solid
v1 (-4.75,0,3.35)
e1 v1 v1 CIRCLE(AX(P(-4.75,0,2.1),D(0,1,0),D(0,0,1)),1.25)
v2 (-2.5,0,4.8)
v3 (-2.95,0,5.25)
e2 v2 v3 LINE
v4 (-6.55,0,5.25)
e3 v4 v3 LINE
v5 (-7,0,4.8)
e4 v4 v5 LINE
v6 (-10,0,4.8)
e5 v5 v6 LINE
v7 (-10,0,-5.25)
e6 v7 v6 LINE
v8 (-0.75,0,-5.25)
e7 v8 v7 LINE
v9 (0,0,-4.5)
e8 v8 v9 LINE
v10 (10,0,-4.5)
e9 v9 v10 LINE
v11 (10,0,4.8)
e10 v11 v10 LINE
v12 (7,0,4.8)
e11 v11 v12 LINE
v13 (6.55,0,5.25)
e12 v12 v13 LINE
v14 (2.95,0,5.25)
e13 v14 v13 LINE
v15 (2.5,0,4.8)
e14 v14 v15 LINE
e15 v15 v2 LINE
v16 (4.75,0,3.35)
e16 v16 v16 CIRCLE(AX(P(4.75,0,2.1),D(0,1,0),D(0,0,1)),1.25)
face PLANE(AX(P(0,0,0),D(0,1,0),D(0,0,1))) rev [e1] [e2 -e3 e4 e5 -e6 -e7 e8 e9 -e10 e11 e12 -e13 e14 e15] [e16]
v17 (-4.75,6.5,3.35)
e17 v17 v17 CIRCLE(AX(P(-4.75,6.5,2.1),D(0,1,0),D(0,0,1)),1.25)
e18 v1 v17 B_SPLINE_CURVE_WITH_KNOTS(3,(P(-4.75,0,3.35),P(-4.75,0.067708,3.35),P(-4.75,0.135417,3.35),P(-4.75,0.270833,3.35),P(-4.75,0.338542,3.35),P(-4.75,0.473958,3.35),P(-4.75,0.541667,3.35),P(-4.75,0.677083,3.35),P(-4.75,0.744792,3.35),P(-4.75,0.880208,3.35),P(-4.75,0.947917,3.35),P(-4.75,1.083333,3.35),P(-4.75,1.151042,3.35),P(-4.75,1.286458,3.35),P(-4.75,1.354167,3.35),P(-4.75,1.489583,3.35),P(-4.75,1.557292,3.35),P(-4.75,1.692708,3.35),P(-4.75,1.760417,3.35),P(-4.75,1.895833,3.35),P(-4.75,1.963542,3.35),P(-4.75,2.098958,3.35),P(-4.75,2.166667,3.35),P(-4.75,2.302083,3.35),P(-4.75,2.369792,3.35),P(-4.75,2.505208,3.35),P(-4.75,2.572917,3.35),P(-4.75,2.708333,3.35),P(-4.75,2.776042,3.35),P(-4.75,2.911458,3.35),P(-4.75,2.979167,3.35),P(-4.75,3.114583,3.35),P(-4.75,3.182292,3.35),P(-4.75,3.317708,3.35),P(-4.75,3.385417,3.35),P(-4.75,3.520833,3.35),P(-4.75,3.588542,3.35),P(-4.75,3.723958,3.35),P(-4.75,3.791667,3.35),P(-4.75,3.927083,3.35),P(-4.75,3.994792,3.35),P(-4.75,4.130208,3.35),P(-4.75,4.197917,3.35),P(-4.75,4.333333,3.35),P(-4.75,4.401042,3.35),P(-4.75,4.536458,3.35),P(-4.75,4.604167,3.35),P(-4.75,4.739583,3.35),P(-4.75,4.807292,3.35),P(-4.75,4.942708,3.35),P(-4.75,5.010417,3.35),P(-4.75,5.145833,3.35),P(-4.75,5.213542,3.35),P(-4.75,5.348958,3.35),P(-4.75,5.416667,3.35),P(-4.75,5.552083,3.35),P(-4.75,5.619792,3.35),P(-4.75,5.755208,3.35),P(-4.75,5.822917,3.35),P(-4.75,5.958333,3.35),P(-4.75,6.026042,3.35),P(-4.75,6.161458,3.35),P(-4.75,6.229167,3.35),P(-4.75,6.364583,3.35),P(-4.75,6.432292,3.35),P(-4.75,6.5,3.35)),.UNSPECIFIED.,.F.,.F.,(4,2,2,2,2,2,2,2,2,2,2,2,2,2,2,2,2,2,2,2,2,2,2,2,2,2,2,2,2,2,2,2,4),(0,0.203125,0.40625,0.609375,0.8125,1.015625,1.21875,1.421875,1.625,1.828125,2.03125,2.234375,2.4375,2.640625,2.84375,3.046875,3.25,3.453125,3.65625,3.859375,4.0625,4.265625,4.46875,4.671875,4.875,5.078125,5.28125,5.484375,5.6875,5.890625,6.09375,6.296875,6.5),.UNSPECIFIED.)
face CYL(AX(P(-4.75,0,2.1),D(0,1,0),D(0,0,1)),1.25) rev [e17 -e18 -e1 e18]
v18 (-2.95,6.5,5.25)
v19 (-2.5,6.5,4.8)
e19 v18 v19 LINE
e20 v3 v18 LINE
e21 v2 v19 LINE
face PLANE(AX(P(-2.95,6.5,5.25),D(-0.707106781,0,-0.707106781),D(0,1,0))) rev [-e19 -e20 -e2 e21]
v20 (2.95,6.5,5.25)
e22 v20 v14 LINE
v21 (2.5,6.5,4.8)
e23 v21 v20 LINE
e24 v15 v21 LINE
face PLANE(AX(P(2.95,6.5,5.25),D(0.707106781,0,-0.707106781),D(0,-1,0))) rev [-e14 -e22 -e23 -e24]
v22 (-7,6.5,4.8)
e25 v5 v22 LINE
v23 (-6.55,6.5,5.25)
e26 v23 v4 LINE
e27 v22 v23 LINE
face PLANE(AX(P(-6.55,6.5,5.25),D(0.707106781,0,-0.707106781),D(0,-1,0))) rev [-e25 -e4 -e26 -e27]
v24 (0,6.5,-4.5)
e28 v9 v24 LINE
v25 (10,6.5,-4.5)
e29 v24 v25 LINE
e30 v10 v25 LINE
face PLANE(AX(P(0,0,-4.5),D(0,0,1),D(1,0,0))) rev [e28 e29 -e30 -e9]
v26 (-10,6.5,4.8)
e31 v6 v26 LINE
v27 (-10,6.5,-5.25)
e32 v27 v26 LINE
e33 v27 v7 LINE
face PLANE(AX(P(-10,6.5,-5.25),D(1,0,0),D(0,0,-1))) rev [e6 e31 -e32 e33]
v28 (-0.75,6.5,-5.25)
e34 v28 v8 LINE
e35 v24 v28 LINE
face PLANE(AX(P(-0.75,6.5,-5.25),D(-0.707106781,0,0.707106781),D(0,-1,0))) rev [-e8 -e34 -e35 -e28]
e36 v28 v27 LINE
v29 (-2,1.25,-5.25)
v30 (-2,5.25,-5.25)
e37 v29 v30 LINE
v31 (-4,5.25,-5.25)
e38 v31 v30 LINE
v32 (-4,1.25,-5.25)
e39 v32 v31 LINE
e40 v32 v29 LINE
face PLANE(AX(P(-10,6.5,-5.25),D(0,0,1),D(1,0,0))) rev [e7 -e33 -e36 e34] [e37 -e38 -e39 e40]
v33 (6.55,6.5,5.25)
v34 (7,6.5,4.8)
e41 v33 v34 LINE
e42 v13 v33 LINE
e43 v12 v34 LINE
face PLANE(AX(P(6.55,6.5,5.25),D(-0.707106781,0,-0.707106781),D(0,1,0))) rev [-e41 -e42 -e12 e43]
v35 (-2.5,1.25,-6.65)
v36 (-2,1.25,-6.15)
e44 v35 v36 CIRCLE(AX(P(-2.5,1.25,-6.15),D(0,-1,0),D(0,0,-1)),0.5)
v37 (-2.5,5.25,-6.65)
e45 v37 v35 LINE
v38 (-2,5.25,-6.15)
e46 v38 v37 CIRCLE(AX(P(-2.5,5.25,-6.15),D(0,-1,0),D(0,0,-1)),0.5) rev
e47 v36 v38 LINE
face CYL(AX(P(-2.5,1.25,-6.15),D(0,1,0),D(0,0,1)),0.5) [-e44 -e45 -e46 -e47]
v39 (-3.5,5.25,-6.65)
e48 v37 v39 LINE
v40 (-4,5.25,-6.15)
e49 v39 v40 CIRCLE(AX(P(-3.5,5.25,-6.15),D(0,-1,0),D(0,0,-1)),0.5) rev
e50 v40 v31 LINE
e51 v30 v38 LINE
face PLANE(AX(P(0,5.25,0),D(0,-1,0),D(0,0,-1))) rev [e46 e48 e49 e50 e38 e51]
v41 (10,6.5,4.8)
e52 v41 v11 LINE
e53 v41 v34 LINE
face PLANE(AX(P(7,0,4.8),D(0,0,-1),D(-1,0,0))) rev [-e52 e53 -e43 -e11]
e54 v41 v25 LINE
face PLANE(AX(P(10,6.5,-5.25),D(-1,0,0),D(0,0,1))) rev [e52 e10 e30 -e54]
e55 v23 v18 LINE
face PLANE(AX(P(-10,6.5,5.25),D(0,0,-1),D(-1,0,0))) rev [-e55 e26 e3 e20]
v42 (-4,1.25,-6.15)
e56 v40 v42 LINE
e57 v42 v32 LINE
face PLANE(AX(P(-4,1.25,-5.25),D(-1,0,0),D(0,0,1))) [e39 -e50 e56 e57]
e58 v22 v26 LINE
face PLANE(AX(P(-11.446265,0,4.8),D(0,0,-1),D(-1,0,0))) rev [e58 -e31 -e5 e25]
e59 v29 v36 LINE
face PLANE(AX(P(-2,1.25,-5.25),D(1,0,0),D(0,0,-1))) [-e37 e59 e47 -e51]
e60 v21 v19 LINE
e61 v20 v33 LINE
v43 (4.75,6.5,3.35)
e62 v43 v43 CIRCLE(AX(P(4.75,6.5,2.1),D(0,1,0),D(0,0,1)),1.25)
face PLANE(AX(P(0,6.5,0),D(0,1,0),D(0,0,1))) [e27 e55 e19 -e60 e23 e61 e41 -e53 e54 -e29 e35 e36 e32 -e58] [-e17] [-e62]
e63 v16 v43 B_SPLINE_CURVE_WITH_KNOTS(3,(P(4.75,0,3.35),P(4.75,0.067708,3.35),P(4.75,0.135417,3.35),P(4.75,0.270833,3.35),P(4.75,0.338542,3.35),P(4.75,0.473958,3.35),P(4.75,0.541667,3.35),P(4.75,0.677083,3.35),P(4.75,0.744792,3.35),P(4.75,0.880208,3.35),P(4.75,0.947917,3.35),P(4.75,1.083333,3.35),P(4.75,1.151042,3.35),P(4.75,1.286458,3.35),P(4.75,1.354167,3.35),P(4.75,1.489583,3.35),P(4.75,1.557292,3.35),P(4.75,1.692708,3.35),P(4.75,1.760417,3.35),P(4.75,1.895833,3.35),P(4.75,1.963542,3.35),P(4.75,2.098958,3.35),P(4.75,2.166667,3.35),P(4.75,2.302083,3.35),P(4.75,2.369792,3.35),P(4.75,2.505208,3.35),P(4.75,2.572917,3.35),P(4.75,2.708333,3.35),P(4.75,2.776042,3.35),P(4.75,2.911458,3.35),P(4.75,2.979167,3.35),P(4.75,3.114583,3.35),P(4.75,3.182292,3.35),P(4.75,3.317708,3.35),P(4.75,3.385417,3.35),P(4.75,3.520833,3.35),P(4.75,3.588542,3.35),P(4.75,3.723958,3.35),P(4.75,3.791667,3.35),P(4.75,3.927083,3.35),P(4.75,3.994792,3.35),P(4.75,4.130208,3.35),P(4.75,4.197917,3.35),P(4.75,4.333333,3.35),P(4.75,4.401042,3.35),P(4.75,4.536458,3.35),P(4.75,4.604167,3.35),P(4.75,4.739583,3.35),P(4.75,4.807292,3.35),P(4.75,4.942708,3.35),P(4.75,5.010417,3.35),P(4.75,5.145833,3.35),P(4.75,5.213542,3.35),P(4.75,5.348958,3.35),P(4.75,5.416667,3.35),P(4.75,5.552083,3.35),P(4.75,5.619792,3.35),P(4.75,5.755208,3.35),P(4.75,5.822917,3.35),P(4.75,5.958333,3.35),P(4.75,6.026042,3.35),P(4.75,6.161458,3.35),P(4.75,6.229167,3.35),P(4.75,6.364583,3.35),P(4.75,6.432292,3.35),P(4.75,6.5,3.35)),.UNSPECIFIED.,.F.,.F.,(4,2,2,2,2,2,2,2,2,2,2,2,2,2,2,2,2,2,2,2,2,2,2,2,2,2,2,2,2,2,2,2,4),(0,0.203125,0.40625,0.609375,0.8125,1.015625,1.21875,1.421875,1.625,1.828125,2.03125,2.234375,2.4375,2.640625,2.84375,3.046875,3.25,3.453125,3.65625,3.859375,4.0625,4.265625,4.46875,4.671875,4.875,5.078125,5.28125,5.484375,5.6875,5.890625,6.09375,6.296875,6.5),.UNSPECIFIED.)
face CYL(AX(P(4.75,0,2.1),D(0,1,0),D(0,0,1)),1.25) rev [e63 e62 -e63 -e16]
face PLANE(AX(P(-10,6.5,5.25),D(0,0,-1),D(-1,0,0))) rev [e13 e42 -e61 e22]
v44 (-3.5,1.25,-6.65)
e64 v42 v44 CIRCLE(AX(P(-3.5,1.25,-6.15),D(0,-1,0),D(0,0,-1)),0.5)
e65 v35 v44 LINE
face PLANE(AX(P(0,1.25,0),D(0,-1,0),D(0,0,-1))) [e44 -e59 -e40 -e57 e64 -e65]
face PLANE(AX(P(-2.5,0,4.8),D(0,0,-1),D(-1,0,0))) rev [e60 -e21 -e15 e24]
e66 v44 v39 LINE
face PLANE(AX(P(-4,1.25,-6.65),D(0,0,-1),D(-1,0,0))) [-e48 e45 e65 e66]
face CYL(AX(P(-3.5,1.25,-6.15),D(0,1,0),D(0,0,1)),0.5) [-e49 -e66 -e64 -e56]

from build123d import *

# Parameters (mm, degrees)
SKETCH_1_W          = 20
SKETCH_1_H          = 10.5
EXTRUDE_1_DEPTH     = 6.5
SKETCH_2_R          = 1.25
CUT_EXTRUDE_1_DEPTH = 6.5
SKETCH_3_W          = 4.44626532
SKETCH_3_H          = 1.008872475
SKETCH_3_W_2        = 5
SKETCH_3_W_3        = 3.65317203
CUT_EXTRUDE_2_DEPTH = 6.5
CHAMFER_1_SIZE      = 0.45
SKETCH_4_W          = 10.31021277
SKETCH_4_H          = 1.008783122
CUT_EXTRUDE_3_DEPTH = 6.5
CHAMFER_2_SIZE      = 0.75
SKETCH_5_W          = 2
SKETCH_5_H          = 1.4
EXTRUDE_2_DEPTH     = 4
FILLET_1_R          = 0.5


with BuildPart() as part:
    # 스케치1 → 보스-돌출1 (new body)
    with BuildSketch(Plane(origin=(0, 0, 0), x_dir=(1, 0, 0), z_dir=(0, 1, 0))):
        Rectangle(SKETCH_1_W, SKETCH_1_H)
    extrude(amount=EXTRUDE_1_DEPTH)

    # 스케치2 → 컷-돌출1 (cut)
    with BuildSketch(Plane(origin=(0, 6.5, 0), x_dir=(1, 0, 0), z_dir=(0, 1, 0))):
        with Locations(Location((-4.75, -2.1, 0), (0, 0, 270))):
            Circle(SKETCH_2_R)
        with Locations(Location((4.75, -2.1, 0), (0, 0, 270))):
            Circle(SKETCH_2_R)
    extrude(amount=-CUT_EXTRUDE_1_DEPTH, mode=Mode.SUBTRACT)

    # 스케치3 → 컷-돌출2 (cut)
    with BuildSketch(Plane(origin=(0, 6.5, 0), x_dir=(1, 0, 0), z_dir=(0, 1, 0))):
        with Locations((-9.22313266, -5.304436238)):
            Rectangle(SKETCH_3_W, SKETCH_3_H)
        with Locations((0, -5.304436238)):
            Rectangle(SKETCH_3_W_2, SKETCH_3_H)
        with Locations((8.826586015, -5.304436238)):
            Rectangle(SKETCH_3_W_3, SKETCH_3_H)
    extrude(amount=-CUT_EXTRUDE_2_DEPTH, mode=Mode.SUBTRACT)

    # 모따기1
    chamfer_1_edges = [part.edges().sort_by_distance(p)[0] for p in [
        (7, 3.25, 5.25),
        (2.5, 3.25, 5.25),
        (-2.5, 3.25, 5.25),
        (-7, 3.25, 5.25),
    ]]
    chamfer(chamfer_1_edges, length=CHAMFER_1_SIZE - 0.0001)  # a hair under: the kernel refuses the full size

    # 스케치4 → 컷-돌출3 (cut)
    with BuildSketch(Plane(origin=(0, 6.5, 0), x_dir=(1, 0, 0), z_dir=(0, 1, 0))):
        with Locations((5.155106385, 5.004391561)):
            Rectangle(SKETCH_4_W, SKETCH_4_H)
    extrude(amount=-CUT_EXTRUDE_3_DEPTH, mode=Mode.SUBTRACT)

    # 모따기2
    chamfer_2_edges = [part.edges().sort_by_distance(p)[0] for p in [
        (0, 3.25, -5.25),
    ]]
    chamfer(chamfer_2_edges, length=CHAMFER_2_SIZE - 0.0001)  # a hair under: the kernel refuses the full size

    # 스케치5 → 보스-돌출2 (add)
    with BuildSketch(Plane(origin=(0, 5.25, 0), x_dir=(1, 0, 0), z_dir=(0, 1, 0))):
        with Locations((-3, 5.95)):
            Rectangle(SKETCH_5_W, SKETCH_5_H)
    extrude(amount=-EXTRUDE_2_DEPTH)

    # 필렛1
    fillet_1_edges = [part.edges().sort_by_distance(p)[0] for p in [
        (-4, 3.25, -6.65),
        (-2, 3.25, -6.65),
    ]]
    fillet(fillet_1_edges, radius=FILLET_1_R)


solid = part.part
